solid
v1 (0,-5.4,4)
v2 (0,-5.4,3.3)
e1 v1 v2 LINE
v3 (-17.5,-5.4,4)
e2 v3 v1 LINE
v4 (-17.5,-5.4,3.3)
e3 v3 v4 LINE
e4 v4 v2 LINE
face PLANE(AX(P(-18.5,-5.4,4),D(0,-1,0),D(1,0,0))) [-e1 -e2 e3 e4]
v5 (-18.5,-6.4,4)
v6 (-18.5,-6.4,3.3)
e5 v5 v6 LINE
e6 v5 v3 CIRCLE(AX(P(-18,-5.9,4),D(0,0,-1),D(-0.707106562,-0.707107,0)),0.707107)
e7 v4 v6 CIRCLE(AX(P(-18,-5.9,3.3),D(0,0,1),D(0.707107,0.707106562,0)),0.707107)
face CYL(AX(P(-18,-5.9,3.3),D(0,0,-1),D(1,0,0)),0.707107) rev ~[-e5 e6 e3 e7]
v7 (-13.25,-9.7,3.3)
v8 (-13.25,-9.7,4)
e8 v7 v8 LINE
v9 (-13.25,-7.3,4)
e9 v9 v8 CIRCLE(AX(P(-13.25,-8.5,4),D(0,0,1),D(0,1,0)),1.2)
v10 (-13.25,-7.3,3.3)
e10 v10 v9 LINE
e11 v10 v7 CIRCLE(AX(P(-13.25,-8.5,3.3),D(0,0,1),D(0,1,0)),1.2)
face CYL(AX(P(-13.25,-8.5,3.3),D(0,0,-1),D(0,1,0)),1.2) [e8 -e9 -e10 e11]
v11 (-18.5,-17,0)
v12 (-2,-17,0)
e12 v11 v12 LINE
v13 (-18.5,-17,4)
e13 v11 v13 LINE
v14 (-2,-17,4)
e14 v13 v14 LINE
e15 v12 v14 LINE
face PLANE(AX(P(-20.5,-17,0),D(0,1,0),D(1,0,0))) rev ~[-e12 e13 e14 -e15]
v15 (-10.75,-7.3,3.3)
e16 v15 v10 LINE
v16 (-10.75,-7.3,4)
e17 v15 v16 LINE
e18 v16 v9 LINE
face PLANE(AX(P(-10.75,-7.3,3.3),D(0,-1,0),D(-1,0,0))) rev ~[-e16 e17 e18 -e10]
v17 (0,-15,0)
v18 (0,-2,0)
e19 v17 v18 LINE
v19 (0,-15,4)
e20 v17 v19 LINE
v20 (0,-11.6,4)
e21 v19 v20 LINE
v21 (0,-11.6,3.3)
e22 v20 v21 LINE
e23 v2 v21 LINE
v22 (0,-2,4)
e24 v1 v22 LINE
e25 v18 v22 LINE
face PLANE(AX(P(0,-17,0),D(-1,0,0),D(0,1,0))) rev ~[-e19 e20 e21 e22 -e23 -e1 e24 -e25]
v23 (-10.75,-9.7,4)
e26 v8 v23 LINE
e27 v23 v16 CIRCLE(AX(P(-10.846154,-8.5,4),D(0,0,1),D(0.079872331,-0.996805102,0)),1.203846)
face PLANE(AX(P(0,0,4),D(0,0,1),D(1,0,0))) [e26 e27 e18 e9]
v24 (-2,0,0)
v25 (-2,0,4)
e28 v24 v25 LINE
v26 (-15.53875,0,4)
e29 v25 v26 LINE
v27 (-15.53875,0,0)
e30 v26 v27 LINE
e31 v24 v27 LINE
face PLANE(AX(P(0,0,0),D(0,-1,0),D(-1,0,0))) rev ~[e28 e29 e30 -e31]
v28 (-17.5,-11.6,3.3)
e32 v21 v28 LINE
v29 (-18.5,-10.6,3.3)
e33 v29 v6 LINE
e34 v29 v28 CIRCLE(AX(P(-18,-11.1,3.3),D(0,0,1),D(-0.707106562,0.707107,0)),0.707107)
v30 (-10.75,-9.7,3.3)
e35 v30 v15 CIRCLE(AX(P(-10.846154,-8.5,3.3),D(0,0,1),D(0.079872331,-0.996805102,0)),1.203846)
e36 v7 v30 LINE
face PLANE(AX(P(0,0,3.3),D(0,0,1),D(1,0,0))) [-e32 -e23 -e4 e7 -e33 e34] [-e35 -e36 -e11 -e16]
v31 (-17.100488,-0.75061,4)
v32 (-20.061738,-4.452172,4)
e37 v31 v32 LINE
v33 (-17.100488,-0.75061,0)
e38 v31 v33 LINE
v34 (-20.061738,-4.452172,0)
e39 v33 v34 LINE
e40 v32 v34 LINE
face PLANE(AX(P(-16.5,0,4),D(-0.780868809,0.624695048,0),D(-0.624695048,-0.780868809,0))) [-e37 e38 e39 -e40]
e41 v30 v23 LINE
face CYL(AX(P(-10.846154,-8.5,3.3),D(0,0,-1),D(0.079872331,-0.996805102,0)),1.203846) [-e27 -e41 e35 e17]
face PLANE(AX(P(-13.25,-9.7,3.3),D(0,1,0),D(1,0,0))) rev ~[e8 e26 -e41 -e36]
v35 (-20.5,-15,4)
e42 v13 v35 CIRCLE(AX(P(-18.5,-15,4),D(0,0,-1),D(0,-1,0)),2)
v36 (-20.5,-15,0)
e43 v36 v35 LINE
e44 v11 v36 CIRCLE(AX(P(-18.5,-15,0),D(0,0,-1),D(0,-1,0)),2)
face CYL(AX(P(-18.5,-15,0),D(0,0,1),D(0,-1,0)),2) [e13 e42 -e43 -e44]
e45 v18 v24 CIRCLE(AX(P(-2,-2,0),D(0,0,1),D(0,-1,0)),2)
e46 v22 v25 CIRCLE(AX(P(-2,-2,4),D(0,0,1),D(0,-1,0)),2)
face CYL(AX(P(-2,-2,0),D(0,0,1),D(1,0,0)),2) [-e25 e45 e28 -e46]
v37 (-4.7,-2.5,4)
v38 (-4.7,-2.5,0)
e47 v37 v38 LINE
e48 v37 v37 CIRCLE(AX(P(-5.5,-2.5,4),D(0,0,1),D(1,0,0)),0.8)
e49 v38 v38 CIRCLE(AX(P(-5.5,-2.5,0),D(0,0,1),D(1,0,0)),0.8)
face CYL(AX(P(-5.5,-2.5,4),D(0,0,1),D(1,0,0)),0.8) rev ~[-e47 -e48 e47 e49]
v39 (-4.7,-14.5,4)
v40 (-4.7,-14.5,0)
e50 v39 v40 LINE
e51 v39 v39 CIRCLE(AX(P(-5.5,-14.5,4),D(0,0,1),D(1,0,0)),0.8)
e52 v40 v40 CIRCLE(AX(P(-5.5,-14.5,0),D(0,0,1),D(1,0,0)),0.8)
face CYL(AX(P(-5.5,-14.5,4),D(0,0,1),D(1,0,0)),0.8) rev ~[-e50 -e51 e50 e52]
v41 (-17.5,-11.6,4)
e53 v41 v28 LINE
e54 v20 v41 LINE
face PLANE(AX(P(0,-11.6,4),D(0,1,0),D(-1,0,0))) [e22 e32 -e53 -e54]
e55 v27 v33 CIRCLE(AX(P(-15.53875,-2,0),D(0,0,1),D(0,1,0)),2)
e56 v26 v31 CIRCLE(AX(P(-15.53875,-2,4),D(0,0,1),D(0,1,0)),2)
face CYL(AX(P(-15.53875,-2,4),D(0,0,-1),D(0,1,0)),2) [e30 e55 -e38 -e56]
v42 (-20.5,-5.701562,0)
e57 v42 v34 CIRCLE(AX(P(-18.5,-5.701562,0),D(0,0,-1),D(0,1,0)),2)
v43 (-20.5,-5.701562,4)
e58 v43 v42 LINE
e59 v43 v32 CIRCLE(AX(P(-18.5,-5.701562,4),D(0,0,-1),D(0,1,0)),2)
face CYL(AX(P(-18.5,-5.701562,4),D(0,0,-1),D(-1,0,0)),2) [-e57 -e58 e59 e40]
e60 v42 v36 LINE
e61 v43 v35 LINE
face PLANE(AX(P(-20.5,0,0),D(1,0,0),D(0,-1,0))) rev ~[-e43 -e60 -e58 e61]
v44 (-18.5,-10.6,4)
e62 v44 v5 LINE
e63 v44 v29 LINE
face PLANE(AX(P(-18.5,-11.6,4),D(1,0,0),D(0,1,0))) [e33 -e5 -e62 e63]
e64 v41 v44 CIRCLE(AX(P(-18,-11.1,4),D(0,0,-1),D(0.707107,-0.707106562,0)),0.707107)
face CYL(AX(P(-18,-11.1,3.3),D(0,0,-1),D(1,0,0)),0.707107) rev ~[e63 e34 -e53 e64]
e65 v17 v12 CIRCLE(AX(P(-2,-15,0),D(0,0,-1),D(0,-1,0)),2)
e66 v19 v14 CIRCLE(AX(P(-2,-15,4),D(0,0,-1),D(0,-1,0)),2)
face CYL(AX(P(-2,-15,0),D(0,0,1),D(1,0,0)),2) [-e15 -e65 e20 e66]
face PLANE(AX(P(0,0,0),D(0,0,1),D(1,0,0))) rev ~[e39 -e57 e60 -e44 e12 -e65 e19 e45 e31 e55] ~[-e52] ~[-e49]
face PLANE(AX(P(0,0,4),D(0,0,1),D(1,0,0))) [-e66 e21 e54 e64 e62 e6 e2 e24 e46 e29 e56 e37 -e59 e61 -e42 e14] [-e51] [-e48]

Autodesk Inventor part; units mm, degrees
ref_plane "YZ Plane" through (0, 0, 0) normal (1, 0, 0) x (0, 1, 0)
ref_plane "XZ Plane" through (0, 0, 0) normal (0, 1, 0) x (-1, 0, 0)
ref_plane "XY Plane" through (0, 0, 0) normal (0, 0, 1) x (1, 0, 0)
sketch "スケッチ1" plane through (0, 0, 0) normal (0, 0, 1) x (1, 0, 0)
  line L0 (0, 0) -> (-20.5, 0)
  line L1 (-20.5, 0) -> (-20.5, -17)
  line L2 (-20.5, -17) -> (0, -17)
  line L3 (0, -17) -> (0, 0)
  dimension "d0" = 20.5
  dimension "d1" = 17
extrude "押し出し1" add sketch "スケッチ1" along normal blind 4
sketch "スケッチ2" plane through (0, 0, 4) normal (0, 0, 1) x (1, 0, 0)
  circle A0 centre (-5.5, -2.5) radius 0.8
  circle A1 centre (-5.5, -14.5) radius 0.8
  point P0 (0, 0)
  dimension "d4" = 1.6
  dimension "d5" = 1.6
extrude "押し出し2" cut sketch "スケッチ2" against normal blind 4
sketch "スケッチ3" plane through (0, 0, 4) normal (0, 0, 1) x (1, 0, 0)
  line L0 (0, -17) -> (0, 0) projected
  line L1 (0, -8.5) -> (0, -11.6)
  line L2 (0, -11.6) -> (-18.5, -11.6)
  line L3 (-20.5, 0) -> (-20.5, -17) projected
  line L4 (-18.5, -11.6) -> (-18.5, -5.4)
  line L5 (-18.5, -5.4) -> (0, -5.4)
  line L6 (0, -5.4) -> (0, -8.5)
  point P0 (0, -5.4)
  dimension "d8" = 3.1
  dimension "d9" = 18.5
  dimension "d10" = 6.2
extrude "押し出し3" cut sketch "スケッチ3" against normal blind 0.7
sketch "スケッチ4" plane through (0, 0, 3.3) normal (0, 0, 1) x (1, 0, 0)
  circle A0 centre (-13.25, -8.5) radius 1.2
  circle A1 centre (-10.846154, -8.5) radius 1.203846
  line L0 (-10.75, -9.7) -> (-13.25, -9.7)
  line L1 (-10.75, -7.3) -> (-13.25, -7.3)
  line L2 (-18.5, -11.6) -> (-18.5, -5.4)
  point P0 (0, 0)
  dimension "d13" = 2.4
  dimension "d16" = 5.25
  dimension "d17" = 2.5
sketch "スケッチ4 outline for 押し出し4" plane through (0, 0, 3.3) normal (0, 0, 1) x (1, 0, 0)
  line L0 (-13.25, -9.7) -> (-10.75, -9.7)
  arc A0 (-13.25, -7.3) -> (-13.25, -9.7) centre (-13.25, -8.5) ccw
  line L1 (-10.75, -7.3) -> (-13.25, -7.3)
  arc A1 (-10.75, -9.7) -> (-10.75, -7.3) centre (-10.846154, -8.5) ccw
extrude "押し出し4" add sketch "スケッチ4 outline for 押し出し4" along normal blind 0.7
sketch "スケッチ5" plane through (0, 0, 4) normal (0, 0, 1) x (1, 0, 0)
  line L0 (-20.5, -17) -> (-20.5, -12)
  line L1 (-20.5, -17) -> (-16.5, -17)
  line L2 (-20.5, 0) -> (-20.5, -5)
  line L3 (-20.5, 0) -> (-16.5, 0)
  line L4 (0, 0) -> (-20.5, 0) projected
  line L5 (-16.5, 0) -> (-20.5, -5)
  dimension "d18" = 5
  dimension "d19" = 4
  dimension "d20" = 5
  dimension "d21" = 4
extrude "押し出し5" cut sketch "スケッチ5" against normal blind 10
fillet "フィレット1" radius 2 5 edges at (-16.5, 0, 2) (-20.5, -5, 2) (-20.5, -17, 2) (0, -17, 2) (0, 0, 2)
fillet_without_effect "フィレット2"
sketch "スケッチ6" plane through (0, 0, 3.3) normal (0, 0, 1) x (1, 0, 0)
  line L0 (-18.5, -5.4) -> (0, -5.4)
  circle A0 centre (-18, -5.9) radius 0.707107
  line L1 (0, -11.6) -> (-18.5, -11.6)
  circle A1 centre (-18, -11.1) radius 0.707107
  line L2 (-18.5, -11.6) -> (-18.5, -5.4)
  point P0 (0, 0)
  dimension "d28" = 0.5
  dimension "d29" = 0.5
  dimension "d30" = 0.5
  dimension "d31" = 0.5
extrude "押し出し6" cut sketch "スケッチ6" along normal blind 0.7
properties part number "cutter_holder-2" material "ABS プラスチック"
